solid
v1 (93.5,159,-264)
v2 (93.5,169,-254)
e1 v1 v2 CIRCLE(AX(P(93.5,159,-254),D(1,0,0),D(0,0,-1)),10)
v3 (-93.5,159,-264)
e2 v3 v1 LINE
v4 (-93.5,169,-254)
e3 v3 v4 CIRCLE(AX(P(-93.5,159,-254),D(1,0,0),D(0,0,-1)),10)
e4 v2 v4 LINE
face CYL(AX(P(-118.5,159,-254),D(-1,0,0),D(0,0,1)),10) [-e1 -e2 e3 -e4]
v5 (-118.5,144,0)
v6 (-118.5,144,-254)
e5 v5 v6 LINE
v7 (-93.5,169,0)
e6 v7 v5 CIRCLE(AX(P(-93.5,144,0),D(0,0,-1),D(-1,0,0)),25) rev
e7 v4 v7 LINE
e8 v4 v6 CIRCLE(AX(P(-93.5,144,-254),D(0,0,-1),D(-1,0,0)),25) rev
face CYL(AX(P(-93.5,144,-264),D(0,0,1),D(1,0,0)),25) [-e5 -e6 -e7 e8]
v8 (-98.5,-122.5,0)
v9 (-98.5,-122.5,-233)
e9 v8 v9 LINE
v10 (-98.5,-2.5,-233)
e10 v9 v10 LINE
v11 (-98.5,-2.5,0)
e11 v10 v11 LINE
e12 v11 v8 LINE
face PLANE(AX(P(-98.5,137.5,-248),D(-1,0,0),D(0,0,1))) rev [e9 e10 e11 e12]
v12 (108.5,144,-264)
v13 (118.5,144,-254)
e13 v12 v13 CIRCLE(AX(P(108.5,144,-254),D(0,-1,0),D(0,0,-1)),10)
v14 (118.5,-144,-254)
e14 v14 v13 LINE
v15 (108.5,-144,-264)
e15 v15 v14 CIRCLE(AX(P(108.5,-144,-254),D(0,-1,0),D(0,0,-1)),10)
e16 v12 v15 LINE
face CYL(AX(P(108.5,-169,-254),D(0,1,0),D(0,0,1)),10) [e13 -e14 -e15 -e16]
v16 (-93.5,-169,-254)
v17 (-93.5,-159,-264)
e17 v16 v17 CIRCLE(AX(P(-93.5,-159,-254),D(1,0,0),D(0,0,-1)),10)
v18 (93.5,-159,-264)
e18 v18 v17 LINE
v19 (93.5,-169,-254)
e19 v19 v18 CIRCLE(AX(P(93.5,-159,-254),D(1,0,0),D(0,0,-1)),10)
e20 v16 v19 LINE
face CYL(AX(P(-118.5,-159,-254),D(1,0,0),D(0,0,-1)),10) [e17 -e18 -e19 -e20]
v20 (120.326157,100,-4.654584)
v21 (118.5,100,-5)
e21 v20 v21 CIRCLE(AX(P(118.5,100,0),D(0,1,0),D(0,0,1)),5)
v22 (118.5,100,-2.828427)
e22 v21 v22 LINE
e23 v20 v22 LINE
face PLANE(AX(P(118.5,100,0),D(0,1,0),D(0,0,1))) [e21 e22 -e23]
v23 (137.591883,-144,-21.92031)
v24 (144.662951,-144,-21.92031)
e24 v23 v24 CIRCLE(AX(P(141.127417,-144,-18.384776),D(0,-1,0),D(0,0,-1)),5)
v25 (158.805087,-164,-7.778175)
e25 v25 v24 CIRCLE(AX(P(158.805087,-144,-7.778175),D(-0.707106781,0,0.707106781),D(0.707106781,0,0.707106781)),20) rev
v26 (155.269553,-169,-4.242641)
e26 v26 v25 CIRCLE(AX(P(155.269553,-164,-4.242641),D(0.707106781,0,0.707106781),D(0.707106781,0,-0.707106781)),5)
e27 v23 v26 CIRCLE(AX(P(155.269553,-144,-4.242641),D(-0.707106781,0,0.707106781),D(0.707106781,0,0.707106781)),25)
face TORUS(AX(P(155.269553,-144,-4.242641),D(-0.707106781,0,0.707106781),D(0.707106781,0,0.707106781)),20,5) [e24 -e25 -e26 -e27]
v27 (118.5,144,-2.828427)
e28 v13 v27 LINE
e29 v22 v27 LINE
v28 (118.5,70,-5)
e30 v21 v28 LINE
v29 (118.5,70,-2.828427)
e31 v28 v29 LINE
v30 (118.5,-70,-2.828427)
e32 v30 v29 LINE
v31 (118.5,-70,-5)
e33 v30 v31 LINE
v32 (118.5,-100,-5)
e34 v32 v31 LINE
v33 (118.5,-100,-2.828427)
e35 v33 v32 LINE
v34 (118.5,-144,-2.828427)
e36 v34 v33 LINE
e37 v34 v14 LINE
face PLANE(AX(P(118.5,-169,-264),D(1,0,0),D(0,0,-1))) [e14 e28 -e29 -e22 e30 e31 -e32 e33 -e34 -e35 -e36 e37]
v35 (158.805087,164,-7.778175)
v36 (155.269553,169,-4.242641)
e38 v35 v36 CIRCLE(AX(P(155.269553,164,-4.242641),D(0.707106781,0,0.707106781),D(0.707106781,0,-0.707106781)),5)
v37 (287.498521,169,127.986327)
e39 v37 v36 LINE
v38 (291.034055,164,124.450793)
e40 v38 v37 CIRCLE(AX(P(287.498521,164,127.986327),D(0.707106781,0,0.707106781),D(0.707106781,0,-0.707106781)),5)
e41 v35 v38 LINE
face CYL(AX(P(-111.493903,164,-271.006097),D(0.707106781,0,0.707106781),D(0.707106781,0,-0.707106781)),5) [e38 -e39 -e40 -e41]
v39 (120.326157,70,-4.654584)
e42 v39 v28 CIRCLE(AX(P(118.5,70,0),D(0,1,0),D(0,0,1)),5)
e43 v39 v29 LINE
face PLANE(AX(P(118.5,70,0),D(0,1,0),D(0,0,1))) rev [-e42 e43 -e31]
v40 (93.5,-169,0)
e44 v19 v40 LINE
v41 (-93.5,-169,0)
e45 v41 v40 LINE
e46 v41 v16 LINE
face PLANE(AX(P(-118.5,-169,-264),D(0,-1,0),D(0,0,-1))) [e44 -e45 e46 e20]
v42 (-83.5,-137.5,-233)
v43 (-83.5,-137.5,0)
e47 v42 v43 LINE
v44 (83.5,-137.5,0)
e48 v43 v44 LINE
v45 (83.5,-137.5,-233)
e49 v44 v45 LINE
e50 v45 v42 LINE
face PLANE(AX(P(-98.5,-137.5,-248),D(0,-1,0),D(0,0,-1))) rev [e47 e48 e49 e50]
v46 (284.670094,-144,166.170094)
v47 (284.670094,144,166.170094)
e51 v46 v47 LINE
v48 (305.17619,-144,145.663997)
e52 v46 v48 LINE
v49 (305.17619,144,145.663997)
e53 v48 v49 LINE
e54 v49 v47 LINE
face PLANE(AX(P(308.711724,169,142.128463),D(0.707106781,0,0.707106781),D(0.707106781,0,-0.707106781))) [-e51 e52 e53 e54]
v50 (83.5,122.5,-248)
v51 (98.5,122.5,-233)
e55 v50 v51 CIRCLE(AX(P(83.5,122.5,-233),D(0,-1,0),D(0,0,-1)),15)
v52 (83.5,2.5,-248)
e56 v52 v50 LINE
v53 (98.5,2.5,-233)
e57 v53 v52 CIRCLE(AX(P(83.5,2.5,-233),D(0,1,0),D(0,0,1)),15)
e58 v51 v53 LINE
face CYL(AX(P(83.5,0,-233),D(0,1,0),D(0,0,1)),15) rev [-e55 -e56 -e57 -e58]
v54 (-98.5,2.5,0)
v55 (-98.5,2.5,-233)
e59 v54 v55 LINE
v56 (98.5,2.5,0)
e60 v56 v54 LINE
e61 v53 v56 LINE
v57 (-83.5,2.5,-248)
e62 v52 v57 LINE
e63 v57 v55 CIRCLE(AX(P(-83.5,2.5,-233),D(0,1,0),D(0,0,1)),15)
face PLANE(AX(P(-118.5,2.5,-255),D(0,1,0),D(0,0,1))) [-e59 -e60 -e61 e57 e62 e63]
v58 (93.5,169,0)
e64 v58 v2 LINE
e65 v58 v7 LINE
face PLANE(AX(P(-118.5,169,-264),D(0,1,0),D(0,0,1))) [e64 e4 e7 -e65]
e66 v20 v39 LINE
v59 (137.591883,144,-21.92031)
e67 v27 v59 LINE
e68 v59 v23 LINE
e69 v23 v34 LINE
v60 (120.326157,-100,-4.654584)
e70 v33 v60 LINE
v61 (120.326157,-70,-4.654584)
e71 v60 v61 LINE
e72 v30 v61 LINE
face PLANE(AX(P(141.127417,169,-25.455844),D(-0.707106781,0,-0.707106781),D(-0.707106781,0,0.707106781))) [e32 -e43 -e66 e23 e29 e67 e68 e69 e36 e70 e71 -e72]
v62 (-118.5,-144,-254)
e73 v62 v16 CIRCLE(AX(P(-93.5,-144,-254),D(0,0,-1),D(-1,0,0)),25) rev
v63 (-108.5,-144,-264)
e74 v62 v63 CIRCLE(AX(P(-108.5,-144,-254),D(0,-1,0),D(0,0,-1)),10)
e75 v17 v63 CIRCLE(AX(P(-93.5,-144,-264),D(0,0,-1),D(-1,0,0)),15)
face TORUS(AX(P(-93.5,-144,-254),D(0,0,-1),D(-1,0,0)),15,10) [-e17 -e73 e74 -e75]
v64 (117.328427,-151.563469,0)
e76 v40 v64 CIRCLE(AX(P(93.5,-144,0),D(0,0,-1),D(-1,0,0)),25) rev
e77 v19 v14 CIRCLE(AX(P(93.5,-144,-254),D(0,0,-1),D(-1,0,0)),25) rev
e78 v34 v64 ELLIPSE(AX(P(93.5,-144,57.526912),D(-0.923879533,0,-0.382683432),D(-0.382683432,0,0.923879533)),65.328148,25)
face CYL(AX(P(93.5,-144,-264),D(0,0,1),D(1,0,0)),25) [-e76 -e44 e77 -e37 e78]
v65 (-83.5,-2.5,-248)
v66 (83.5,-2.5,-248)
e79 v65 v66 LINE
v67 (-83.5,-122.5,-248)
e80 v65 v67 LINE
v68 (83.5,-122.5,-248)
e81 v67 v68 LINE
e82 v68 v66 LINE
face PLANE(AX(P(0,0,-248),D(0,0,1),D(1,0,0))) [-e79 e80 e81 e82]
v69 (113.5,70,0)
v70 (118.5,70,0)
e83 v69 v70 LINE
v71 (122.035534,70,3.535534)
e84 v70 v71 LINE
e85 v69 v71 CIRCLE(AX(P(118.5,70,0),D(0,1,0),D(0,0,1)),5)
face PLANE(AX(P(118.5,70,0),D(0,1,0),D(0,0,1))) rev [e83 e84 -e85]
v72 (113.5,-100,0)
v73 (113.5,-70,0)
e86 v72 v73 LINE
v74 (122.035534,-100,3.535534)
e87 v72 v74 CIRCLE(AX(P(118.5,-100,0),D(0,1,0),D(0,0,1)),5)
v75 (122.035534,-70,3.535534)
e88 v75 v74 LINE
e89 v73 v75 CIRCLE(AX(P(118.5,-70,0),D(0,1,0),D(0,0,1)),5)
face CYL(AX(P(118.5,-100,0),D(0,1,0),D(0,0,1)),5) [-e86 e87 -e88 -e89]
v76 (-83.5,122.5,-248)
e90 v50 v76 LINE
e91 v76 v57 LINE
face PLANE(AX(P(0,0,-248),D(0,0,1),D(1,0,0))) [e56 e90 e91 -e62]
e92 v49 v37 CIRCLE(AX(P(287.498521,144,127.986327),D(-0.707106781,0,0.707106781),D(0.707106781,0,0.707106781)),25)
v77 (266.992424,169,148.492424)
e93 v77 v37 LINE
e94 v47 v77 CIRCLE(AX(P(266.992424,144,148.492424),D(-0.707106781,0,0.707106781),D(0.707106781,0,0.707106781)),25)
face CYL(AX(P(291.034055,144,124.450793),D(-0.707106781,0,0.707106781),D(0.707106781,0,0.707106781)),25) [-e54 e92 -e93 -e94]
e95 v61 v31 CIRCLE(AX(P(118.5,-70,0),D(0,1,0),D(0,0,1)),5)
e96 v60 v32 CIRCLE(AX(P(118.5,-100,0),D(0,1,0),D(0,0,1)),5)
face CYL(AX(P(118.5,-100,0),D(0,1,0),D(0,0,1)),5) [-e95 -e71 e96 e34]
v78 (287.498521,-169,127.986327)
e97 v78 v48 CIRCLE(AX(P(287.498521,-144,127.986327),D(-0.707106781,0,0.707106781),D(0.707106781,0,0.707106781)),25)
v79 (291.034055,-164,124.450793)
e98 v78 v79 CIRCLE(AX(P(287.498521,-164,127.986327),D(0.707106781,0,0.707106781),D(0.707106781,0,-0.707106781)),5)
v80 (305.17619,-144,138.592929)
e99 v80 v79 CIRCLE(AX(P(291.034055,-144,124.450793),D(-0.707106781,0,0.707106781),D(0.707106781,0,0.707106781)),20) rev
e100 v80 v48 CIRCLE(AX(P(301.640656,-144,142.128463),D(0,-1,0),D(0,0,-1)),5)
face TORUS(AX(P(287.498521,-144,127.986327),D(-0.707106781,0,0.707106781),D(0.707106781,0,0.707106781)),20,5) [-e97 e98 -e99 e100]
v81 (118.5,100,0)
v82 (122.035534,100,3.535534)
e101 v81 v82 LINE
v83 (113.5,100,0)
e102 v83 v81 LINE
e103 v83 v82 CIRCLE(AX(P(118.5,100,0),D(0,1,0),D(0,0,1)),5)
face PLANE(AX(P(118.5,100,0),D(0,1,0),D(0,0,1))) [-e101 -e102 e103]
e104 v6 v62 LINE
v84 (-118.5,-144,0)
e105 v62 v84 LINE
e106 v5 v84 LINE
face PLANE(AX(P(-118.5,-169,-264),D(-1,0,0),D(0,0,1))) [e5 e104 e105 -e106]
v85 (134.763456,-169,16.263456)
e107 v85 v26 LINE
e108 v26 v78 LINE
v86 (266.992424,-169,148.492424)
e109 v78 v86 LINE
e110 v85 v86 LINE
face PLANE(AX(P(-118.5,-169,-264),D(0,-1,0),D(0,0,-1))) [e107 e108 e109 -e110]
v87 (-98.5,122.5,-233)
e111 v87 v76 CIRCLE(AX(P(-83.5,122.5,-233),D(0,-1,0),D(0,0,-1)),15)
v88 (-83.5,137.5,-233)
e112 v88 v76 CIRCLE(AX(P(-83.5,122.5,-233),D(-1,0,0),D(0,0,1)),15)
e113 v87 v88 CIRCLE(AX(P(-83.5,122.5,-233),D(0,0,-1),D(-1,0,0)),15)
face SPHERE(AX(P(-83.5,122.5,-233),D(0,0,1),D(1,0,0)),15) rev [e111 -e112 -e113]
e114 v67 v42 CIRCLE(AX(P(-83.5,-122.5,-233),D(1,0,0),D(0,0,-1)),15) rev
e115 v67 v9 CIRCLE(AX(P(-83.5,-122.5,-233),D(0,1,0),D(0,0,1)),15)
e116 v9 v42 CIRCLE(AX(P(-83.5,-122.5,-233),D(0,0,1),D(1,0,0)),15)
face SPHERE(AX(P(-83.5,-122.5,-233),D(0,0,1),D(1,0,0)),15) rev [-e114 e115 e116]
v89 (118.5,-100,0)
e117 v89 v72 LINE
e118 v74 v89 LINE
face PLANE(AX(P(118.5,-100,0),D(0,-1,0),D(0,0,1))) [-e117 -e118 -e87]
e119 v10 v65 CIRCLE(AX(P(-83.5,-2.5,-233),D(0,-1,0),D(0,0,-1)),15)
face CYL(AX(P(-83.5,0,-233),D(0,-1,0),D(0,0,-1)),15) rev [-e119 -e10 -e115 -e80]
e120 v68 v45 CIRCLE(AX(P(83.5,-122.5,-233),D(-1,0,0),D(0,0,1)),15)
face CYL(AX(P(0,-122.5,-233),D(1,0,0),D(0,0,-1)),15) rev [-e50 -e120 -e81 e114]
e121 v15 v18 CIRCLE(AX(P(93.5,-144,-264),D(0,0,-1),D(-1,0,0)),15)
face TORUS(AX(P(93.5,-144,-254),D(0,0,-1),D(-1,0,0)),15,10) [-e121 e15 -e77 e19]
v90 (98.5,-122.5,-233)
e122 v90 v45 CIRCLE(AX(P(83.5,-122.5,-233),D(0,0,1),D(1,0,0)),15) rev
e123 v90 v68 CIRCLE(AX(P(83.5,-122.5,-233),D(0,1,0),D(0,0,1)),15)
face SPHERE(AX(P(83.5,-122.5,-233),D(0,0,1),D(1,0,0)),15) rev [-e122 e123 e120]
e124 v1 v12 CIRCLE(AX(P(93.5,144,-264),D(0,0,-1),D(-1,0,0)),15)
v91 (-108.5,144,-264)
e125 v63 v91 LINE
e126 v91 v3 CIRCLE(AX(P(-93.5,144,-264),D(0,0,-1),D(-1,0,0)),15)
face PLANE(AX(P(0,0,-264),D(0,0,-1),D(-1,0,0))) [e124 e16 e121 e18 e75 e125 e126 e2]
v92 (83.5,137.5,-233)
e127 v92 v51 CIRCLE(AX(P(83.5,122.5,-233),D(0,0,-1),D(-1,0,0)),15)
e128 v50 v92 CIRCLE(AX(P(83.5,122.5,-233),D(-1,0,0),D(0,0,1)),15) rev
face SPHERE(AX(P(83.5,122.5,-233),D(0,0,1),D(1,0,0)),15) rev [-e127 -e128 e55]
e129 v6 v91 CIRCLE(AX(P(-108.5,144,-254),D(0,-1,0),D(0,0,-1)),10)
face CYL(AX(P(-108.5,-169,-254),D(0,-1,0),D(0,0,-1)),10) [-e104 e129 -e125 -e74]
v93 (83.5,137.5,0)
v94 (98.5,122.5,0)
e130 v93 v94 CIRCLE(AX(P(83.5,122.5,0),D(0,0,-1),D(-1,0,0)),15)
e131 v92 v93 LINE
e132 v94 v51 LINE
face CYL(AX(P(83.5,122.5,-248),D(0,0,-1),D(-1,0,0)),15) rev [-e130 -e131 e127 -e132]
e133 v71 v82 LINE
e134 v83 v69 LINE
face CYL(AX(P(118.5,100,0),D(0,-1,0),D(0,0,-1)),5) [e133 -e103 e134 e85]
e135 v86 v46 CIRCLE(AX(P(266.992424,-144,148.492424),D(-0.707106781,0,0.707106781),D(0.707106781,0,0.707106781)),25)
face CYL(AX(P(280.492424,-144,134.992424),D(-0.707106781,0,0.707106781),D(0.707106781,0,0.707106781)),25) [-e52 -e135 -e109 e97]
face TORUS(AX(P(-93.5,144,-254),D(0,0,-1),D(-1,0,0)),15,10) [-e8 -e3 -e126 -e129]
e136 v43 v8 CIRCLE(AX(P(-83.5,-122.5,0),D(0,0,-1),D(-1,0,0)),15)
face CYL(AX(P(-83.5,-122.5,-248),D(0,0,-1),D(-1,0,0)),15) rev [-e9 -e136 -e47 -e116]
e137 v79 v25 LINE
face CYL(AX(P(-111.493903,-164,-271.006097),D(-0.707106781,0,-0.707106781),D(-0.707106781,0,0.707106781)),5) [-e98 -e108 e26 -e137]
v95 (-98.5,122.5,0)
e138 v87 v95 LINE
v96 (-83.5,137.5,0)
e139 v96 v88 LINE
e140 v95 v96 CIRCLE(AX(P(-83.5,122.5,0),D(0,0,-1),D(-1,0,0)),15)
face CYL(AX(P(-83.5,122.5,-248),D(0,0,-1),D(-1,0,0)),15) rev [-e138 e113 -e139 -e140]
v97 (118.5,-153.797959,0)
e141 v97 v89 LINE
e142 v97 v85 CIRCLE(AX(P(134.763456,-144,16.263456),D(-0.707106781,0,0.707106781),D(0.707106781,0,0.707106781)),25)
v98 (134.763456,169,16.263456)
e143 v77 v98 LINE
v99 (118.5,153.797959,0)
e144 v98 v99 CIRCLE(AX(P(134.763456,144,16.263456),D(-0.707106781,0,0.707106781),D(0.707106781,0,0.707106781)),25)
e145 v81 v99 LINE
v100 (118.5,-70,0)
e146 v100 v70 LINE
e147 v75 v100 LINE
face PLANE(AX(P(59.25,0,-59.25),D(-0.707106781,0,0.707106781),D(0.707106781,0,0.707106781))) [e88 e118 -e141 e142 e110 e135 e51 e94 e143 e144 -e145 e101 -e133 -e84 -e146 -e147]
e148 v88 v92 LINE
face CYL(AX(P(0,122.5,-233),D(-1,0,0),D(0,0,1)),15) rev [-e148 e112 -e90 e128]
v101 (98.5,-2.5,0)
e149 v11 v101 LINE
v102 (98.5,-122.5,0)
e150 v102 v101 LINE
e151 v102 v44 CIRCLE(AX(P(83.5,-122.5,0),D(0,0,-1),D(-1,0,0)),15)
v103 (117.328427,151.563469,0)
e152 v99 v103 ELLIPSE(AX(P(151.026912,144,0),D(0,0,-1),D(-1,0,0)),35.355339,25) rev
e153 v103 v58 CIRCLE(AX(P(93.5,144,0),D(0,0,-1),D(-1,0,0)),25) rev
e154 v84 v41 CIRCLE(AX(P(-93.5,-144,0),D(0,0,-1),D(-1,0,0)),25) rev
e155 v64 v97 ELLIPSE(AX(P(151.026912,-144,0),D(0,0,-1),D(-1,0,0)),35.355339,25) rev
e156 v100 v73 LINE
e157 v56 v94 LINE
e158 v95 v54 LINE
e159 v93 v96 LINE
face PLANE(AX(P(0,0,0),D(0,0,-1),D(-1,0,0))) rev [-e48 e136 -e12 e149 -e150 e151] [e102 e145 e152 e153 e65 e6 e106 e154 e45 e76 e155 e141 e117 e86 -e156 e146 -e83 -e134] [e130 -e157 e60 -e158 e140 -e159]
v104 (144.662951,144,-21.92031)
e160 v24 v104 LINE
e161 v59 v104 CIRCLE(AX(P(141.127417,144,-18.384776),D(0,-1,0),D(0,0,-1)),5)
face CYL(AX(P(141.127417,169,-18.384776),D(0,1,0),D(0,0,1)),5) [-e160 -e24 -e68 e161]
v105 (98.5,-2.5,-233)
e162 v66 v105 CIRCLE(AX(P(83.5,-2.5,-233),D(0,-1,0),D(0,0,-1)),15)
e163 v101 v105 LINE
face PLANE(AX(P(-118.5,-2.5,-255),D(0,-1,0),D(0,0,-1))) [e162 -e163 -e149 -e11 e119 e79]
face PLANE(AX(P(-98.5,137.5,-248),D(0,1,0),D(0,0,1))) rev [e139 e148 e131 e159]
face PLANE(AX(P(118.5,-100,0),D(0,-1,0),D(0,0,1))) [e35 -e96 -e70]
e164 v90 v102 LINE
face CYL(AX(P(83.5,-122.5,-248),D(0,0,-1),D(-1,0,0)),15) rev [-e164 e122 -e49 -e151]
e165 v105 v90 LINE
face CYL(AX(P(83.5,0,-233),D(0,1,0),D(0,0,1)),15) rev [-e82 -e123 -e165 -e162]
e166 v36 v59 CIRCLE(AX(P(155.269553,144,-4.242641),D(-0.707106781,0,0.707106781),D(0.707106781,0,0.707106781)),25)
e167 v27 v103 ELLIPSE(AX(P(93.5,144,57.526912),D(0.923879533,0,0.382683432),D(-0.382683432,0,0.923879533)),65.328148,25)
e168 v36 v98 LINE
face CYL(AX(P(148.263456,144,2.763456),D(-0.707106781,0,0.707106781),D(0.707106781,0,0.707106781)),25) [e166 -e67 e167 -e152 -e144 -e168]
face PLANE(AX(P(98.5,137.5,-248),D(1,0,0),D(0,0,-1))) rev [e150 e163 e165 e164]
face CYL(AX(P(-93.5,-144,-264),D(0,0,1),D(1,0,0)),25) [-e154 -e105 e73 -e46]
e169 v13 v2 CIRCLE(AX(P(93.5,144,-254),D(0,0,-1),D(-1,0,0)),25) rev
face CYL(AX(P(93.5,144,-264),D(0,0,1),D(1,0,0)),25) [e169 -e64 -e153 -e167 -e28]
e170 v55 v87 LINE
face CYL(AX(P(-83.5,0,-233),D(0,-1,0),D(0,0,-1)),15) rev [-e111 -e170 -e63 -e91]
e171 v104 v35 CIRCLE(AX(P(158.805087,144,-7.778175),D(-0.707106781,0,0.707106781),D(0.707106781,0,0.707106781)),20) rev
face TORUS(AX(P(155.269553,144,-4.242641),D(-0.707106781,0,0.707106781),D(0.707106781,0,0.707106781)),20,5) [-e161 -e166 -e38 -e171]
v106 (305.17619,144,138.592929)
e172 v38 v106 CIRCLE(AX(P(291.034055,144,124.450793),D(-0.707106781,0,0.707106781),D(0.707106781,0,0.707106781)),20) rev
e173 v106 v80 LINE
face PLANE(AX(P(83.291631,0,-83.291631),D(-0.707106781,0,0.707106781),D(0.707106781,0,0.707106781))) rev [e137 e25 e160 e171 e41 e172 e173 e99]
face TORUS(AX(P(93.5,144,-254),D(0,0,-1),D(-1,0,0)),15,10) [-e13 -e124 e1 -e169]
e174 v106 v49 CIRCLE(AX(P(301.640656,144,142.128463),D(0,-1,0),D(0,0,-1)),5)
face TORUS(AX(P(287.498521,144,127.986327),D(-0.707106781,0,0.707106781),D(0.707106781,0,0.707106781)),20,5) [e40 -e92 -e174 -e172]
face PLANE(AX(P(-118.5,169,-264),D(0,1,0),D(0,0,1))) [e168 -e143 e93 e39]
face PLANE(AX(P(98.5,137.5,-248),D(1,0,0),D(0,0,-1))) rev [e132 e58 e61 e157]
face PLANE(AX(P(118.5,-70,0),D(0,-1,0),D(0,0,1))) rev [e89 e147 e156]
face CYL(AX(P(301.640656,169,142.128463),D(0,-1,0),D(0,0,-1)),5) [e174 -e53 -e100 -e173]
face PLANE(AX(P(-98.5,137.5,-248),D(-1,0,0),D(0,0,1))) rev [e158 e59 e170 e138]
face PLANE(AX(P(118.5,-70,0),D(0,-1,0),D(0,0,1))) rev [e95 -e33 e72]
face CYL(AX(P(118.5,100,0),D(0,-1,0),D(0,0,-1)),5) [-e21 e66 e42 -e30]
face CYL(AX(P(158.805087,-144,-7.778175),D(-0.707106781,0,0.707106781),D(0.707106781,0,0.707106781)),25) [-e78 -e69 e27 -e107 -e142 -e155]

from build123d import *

# Parameters (mm, degrees)
SKETCH_1_W          = 237
SKETCH_1_H          = 338
EXTRUDE_1_DEPTH     = 264
SKETCH_2_W          = 197
SKETCH_2_H          = 275
CUT_EXTRUDE_1_DEPTH = 248
SKETCH_3_W          = 237
SKETCH_3_H          = 5
EXTRUDE_2_DEPTH     = 255
EXTRUDE_START       = 70
SKETCH_4_R          = 5
EXTRUDE_3_DEPTH     = 30
SKETCH_6_W          = 338
SKETCH_6_H          = 237
EXTRUDE_6_DEPTH     = 34
FILLET_1_R          = 25
FILLET_2_R          = 10
FILLET_3_R          = 5
FILLET_4_R          = 15
FILLET_5_R          = 15


with BuildPart() as part:
    # 草图1 → 凸台-拉伸1 (new body)
    with BuildSketch(Plane.XY):
        Rectangle(SKETCH_1_W, SKETCH_1_H)
    extrude(amount=-EXTRUDE_1_DEPTH)

    # 草图2 → 切除-拉伸1 (cut)
    with BuildSketch(Plane.XY):
        Rectangle(SKETCH_2_W, SKETCH_2_H)
    extrude(amount=-CUT_EXTRUDE_1_DEPTH, mode=Mode.SUBTRACT)

    # 草图3 → 凸台-拉伸2 (add)
    with BuildSketch(Plane.XY):
        Rectangle(SKETCH_3_W, SKETCH_3_H)
    extrude(amount=-EXTRUDE_2_DEPTH)

    # 草图4 → 凸台-拉伸3 (add)
    with BuildSketch(Plane(origin=(0, 0, 0), x_dir=(1, 0, 0), z_dir=(0, 1, 0)).offset(EXTRUDE_START)):
        with Locations((118.5, 0)):
            Circle(SKETCH_4_R)
    extrude_3 = extrude(amount=EXTRUDE_3_DEPTH)

    # 镜向1: 凸台-拉伸3 across plane
    add(extrude_3.mirror(Plane.ZX))

    # 草图6 → 凸台-拉伸6 (add)
    with BuildSketch(Plane(origin=(59.25, 0, -59.25), x_dir=(0, 1, 0), z_dir=(-0.7071067811865438, 0, 0.7071067811865512))):
        with Locations((0, -200.292153571)):
            Rectangle(SKETCH_6_W, SKETCH_6_H)
    extrude(amount=-EXTRUDE_6_DEPTH)

    # 圆角1
    # the kernel refuses this fillet: 25 mm, written as the material it takes off along each edge
    with BuildSketch(Plane(origin=(118.5, -169, 59.671572875), x_dir=(-1, 0, 0), z_dir=(0, 0, -1))) as fillet_1_piece_1_section:
        with BuildLine():
            CenterArc((FILLET_1_R, FILLET_1_R), FILLET_1_R, 180, 90)
            Line((0, FILLET_1_R), (-FILLET_1_R * 0.02, FILLET_1_R))
            Line((-FILLET_1_R * 0.02, FILLET_1_R), (-FILLET_1_R * 0.02, -FILLET_1_R * 0.02))
            Line((-FILLET_1_R * 0.02, -FILLET_1_R * 0.02), (FILLET_1_R, -FILLET_1_R * 0.02))
            Line((FILLET_1_R, -FILLET_1_R * 0.02), (FILLET_1_R, 0))
        make_face()
    fillet_1_piece_1 = extrude(amount=323.671572875, mode=Mode.PRIVATE)
    fillet_1_piece_1 = split(fillet_1_piece_1, bisect_by=Plane(origin=(179.466338067, -163.404434067, -63.794765192), z_dir=(-0.7071067811865512, 0, -0.7071067811865438)), keep=Keep.TOP, mode=Mode.PRIVATE)
    add(fillet_1_piece_1, mode=Mode.SUBTRACT)
    with BuildSketch(Plane(origin=(-118.5, -169, 0), x_dir=(1, 0, 0), z_dir=(0, 0, -1)), Plane(origin=(-118.5, 169, 0), x_dir=(0, -1, 0), z_dir=(0, 0, -1))) as fillet_1_piece_2:
        with BuildLine():
            CenterArc((FILLET_1_R, -FILLET_1_R), FILLET_1_R, 90, 90)
            Line((0, -FILLET_1_R), (-FILLET_1_R * 0.02, -FILLET_1_R))
            Line((-FILLET_1_R * 0.02, -FILLET_1_R), (-FILLET_1_R * 0.02, FILLET_1_R * 0.02))
            Line((-FILLET_1_R * 0.02, FILLET_1_R * 0.02), (FILLET_1_R, FILLET_1_R * 0.02))
            Line((FILLET_1_R, FILLET_1_R * 0.02), (FILLET_1_R, 0))
        make_face()
    extrude(amount=264, mode=Mode.SUBTRACT)
    with BuildSketch(Plane(origin=(118.5, 169, 59.671572875), x_dir=(0, -1, 0), z_dir=(0, 0, -1))) as fillet_1_piece_3_section:
        with BuildLine():
            CenterArc((FILLET_1_R, FILLET_1_R), FILLET_1_R, 180, 90)
            Line((0, FILLET_1_R), (-FILLET_1_R * 0.02, FILLET_1_R))
            Line((-FILLET_1_R * 0.02, FILLET_1_R), (-FILLET_1_R * 0.02, -FILLET_1_R * 0.02))
            Line((-FILLET_1_R * 0.02, -FILLET_1_R * 0.02), (FILLET_1_R, -FILLET_1_R * 0.02))
            Line((FILLET_1_R, -FILLET_1_R * 0.02), (FILLET_1_R, 0))
        make_face()
    fillet_1_piece_3 = extrude(amount=323.671572875, mode=Mode.PRIVATE)
    fillet_1_piece_3 = split(fillet_1_piece_3, bisect_by=Plane(origin=(179.466338067, 163.404434067, -63.794765192), z_dir=(-0.7071067811865512, 0, -0.7071067811865438)), keep=Keep.TOP, mode=Mode.PRIVATE)
    add(fillet_1_piece_3, mode=Mode.SUBTRACT)
    with BuildSketch(Plane(origin=(284.670093579, -169, 166.170093579), x_dir=(-0.7071067811865512, -1.1368683772161603e-15, -0.7071067811865439), z_dir=(0.7071067811865438, 0, -0.7071067811865512))) as fillet_1_piece_4:
        with BuildLine():
            CenterArc((FILLET_1_R, FILLET_1_R), FILLET_1_R, 180, 90)
            Line((0, FILLET_1_R), (-FILLET_1_R * 0.02, FILLET_1_R))
            Line((-FILLET_1_R * 0.02, FILLET_1_R), (-FILLET_1_R * 0.02, -FILLET_1_R * 0.02))
            Line((-FILLET_1_R * 0.02, -FILLET_1_R * 0.02), (FILLET_1_R, -FILLET_1_R * 0.02))
            Line((FILLET_1_R, -FILLET_1_R * 0.02), (FILLET_1_R, 0))
        make_face()
    extrude(amount=34, mode=Mode.SUBTRACT)
    with BuildSketch(Plane(origin=(74.305826176, -169, 41.365746699), x_dir=(0.7071067811865512, 0, 0.7071067811865439), z_dir=(0.7071067811865438, 0, -0.7071067811865512))) as fillet_1_piece_5_section:
        with BuildLine():
            CenterArc((FILLET_1_R, -FILLET_1_R), FILLET_1_R, 90, 90)
            Line((0, -FILLET_1_R), (-FILLET_1_R * 0.02, -FILLET_1_R))
            Line((-FILLET_1_R * 0.02, -FILLET_1_R), (-FILLET_1_R * 0.02, FILLET_1_R * 0.02))
            Line((-FILLET_1_R * 0.02, FILLET_1_R * 0.02), (FILLET_1_R, FILLET_1_R * 0.02))
            Line((FILLET_1_R, FILLET_1_R * 0.02), (FILLET_1_R, 0))
        make_face()
    fillet_1_piece_5 = extrude(amount=94.5, mode=Mode.PRIVATE)
    fillet_1_piece_5 = split(fillet_1_piece_5, bisect_by=Plane(origin=(118.5, -163.795791277, -7.320817928), z_dir=(1, 0, 0)), keep=Keep.TOP, mode=Mode.PRIVATE)
    add(fillet_1_piece_5, mode=Mode.SUBTRACT)
    with BuildSketch(Plane(origin=(74.305826176, 169, 41.365746699), x_dir=(0.7071067811865512, 0, 0.7071067811865438), z_dir=(0.7071067811865438, 0, -0.7071067811865512))) as fillet_1_piece_6_section:
        with BuildLine():
            CenterArc((FILLET_1_R, FILLET_1_R), FILLET_1_R, 180, 90)
            Line((0, FILLET_1_R), (-FILLET_1_R * 0.02, FILLET_1_R))
            Line((-FILLET_1_R * 0.02, FILLET_1_R), (-FILLET_1_R * 0.02, -FILLET_1_R * 0.02))
            Line((-FILLET_1_R * 0.02, -FILLET_1_R * 0.02), (FILLET_1_R, -FILLET_1_R * 0.02))
            Line((FILLET_1_R, -FILLET_1_R * 0.02), (FILLET_1_R, 0))
        make_face()
    fillet_1_piece_6 = extrude(amount=94.5, mode=Mode.PRIVATE)
    fillet_1_piece_6 = split(fillet_1_piece_6, bisect_by=Plane(origin=(118.5, 163.795791277, -7.320817928), z_dir=(1, 0, 0)), keep=Keep.TOP, mode=Mode.PRIVATE)
    add(fillet_1_piece_6, mode=Mode.SUBTRACT)
    with BuildSketch(Plane(origin=(284.670093579, 169, 166.170093579), x_dir=(-0.7071067811865512, -3.4106051316484808e-15, -0.7071067811865439), z_dir=(0.7071067811865438, 0, -0.7071067811865512))) as fillet_1_piece_7:
        with BuildLine():
            CenterArc((FILLET_1_R, -FILLET_1_R), FILLET_1_R, 90, 90)
            Line((0, -FILLET_1_R), (-FILLET_1_R * 0.02, -FILLET_1_R))
            Line((-FILLET_1_R * 0.02, -FILLET_1_R), (-FILLET_1_R * 0.02, FILLET_1_R * 0.02))
            Line((-FILLET_1_R * 0.02, FILLET_1_R * 0.02), (FILLET_1_R, FILLET_1_R * 0.02))
            Line((FILLET_1_R, FILLET_1_R * 0.02), (FILLET_1_R, 0))
        make_face()
    extrude(amount=34, mode=Mode.SUBTRACT)
    with BuildSketch(Plane(origin=(118.5, -169, 59.671572875), x_dir=(-1, 0, 0), z_dir=(0, 0, -1))) as fillet_1_piece_8a_section:
        with BuildLine():
            CenterArc((FILLET_1_R, FILLET_1_R), FILLET_1_R, 180, 90)
            Line((0, FILLET_1_R), (-FILLET_1_R * 0.02, FILLET_1_R))
            Line((-FILLET_1_R * 0.02, FILLET_1_R), (-FILLET_1_R * 0.02, -FILLET_1_R * 0.02))
            Line((-FILLET_1_R * 0.02, -FILLET_1_R * 0.02), (FILLET_1_R, -FILLET_1_R * 0.02))
            Line((FILLET_1_R, -FILLET_1_R * 0.02), (FILLET_1_R, 0))
        make_face()
    fillet_1_piece_8a = extrude(amount=323.671572875, mode=Mode.PRIVATE)
    fillet_1_piece_8a = split(fillet_1_piece_8a, bisect_by=Plane(origin=(99.013375852, -163.038214912, 16.658197024), z_dir=(0.7071067811865512, 0, 0.7071067811865438)), keep=Keep.TOP, mode=Mode.PRIVATE)
    with BuildSketch(Plane(origin=(74.305826176, -169, 41.365746699), x_dir=(0.7071067811865512, 0, 0.7071067811865439), z_dir=(0.7071067811865438, 0, -0.7071067811865512))) as fillet_1_piece_8b_section:
        with BuildLine():
            CenterArc((FILLET_1_R, -FILLET_1_R), FILLET_1_R, 90, 90)
            Line((0, -FILLET_1_R), (-FILLET_1_R * 0.02, -FILLET_1_R))
            Line((-FILLET_1_R * 0.02, -FILLET_1_R), (-FILLET_1_R * 0.02, FILLET_1_R * 0.02))
            Line((-FILLET_1_R * 0.02, FILLET_1_R * 0.02), (FILLET_1_R, FILLET_1_R * 0.02))
            Line((FILLET_1_R, FILLET_1_R * 0.02), (FILLET_1_R, 0))
        make_face()
    fillet_1_piece_8b = extrude(amount=94.5, mode=Mode.PRIVATE)
    fillet_1_piece_8b = split(fillet_1_piece_8b, bisect_by=Plane(origin=(118.5, -163.038214912, 24.729821031), z_dir=(-1, 0, 0)), keep=Keep.TOP, mode=Mode.PRIVATE)
    fillet_1_piece_8 = fillet_1_piece_8a & fillet_1_piece_8b
    add(fillet_1_piece_8, mode=Mode.SUBTRACT)
    with BuildSketch(Plane(origin=(118.5, 169, 59.671572875), x_dir=(0, -1, 0), z_dir=(0, 0, -1))) as fillet_1_piece_9a_section:
        with BuildLine():
            CenterArc((FILLET_1_R, FILLET_1_R), FILLET_1_R, 180, 90)
            Line((0, FILLET_1_R), (-FILLET_1_R * 0.02, FILLET_1_R))
            Line((-FILLET_1_R * 0.02, FILLET_1_R), (-FILLET_1_R * 0.02, -FILLET_1_R * 0.02))
            Line((-FILLET_1_R * 0.02, -FILLET_1_R * 0.02), (FILLET_1_R, -FILLET_1_R * 0.02))
            Line((FILLET_1_R, -FILLET_1_R * 0.02), (FILLET_1_R, 0))
        make_face()
    fillet_1_piece_9a = extrude(amount=323.671572875, mode=Mode.PRIVATE)
    fillet_1_piece_9a = split(fillet_1_piece_9a, bisect_by=Plane(origin=(99.013375852, 163.038214912, 16.658197024), z_dir=(0.7071067811865512, 0, 0.7071067811865438)), keep=Keep.TOP, mode=Mode.PRIVATE)
    with BuildSketch(Plane(origin=(74.305826176, 169, 41.365746699), x_dir=(0.7071067811865512, 0, 0.7071067811865438), z_dir=(0.7071067811865438, 0, -0.7071067811865512))) as fillet_1_piece_9b_section:
        with BuildLine():
            CenterArc((FILLET_1_R, FILLET_1_R), FILLET_1_R, 180, 90)
            Line((0, FILLET_1_R), (-FILLET_1_R * 0.02, FILLET_1_R))
            Line((-FILLET_1_R * 0.02, FILLET_1_R), (-FILLET_1_R * 0.02, -FILLET_1_R * 0.02))
            Line((-FILLET_1_R * 0.02, -FILLET_1_R * 0.02), (FILLET_1_R, -FILLET_1_R * 0.02))
            Line((FILLET_1_R, -FILLET_1_R * 0.02), (FILLET_1_R, 0))
        make_face()
    fillet_1_piece_9b = extrude(amount=94.5, mode=Mode.PRIVATE)
    fillet_1_piece_9b = split(fillet_1_piece_9b, bisect_by=Plane(origin=(118.5, 163.038214912, 24.729821031), z_dir=(-1, 0, 0)), keep=Keep.TOP, mode=Mode.PRIVATE)
    fillet_1_piece_9 = fillet_1_piece_9a & fillet_1_piece_9b
    add(fillet_1_piece_9, mode=Mode.SUBTRACT)

    # 圆角2
    fillet_2_edges = [part.edges().sort_by_distance(p)[0] for p in [
        (0, -169, -264),
        (118.5, 0, -264),
        (-118.5, 0, -264),
        (0, 169, -264),
        (-111.17766953, 161.67766953, -264),
        (111.17766953, 161.67766953, -264),
        (-111.17766953, -161.67766953, -264),
        (111.17766953, -161.67766953, -264),
    ]]
    fillet(fillet_2_edges, radius=FILLET_2_R)

    # 圆角3
    fillet_3_edges = [part.edges().sort_by_distance(p)[0] for p in [
        (224.919570569, -169, 58.336309448),
        (141.127416998, 0, -25.455844123),
        (224.919570569, 169, 58.336309448),
        (308.711724139, 0, 142.128463018),
        (146.305086528, 161.67766953, -20.278174593),
        (303.53405461, 161.67766953, 136.950793489),
        (303.53405461, -161.67766953, 136.950793489),
        (146.305086528, -161.67766953, -20.278174593),
    ]]
    fillet(fillet_3_edges, radius=FILLET_3_R)

    # 圆角4
    fillet_4_edges = [part.edges().sort_by_distance(p)[0] for p in [
        (98.5, -70, -248),
        (98.5, 137.5, -124),
        (0, -137.5, -248),
        (98.5, -137.5, -124),
        (-98.5, -137.5, -124),
        (0, 137.5, -248),
        (-98.5, 137.5, -124),
        (-98.5, -70, -248),
    ]]
    fillet(fillet_4_edges, radius=FILLET_4_R)

    # 圆角5
    # the kernel refuses this fillet: 15 mm, written as the material it adds along each edge
    with BuildSketch(Plane(origin=(-83.5, 122.5, -233), x_dir=(0, 0, -1), z_dir=(-1, 0, 0))) as fillet_5_piece_1_section:
        Polygon((0, 0), (FILLET_5_R * 1.02, 0), (FILLET_5_R * 1.02, -FILLET_5_R * 1.02), (0, -FILLET_5_R * 1.02), align=None)
    fillet_5_piece_1 = extrude(amount=FILLET_5_R * 1.02, mode=Mode.PRIVATE)
    fillet_5_piece_1 = fillet_5_piece_1 - Plane(origin=(-83.5, 122.5, -233), x_dir=(0, -0.7071067811865475, 0.7071067811865475), z_dir=(-1, 0, 0)) * Sphere(FILLET_5_R, mode=Mode.PRIVATE)
    add(fillet_5_piece_1)
    with BuildSketch(Plane(origin=(83.5, 122.5, -233), x_dir=(0, 0, -1), z_dir=(1, 0, 0))) as fillet_5_piece_2_section:
        Polygon((0, 0), (FILLET_5_R * 1.02, 0), (FILLET_5_R * 1.02, FILLET_5_R * 1.02), (0, FILLET_5_R * 1.02), align=None)
    fillet_5_piece_2 = extrude(amount=FILLET_5_R * 1.02, mode=Mode.PRIVATE)
    fillet_5_piece_2 = fillet_5_piece_2 - Plane(origin=(83.5, 122.5, -233), x_dir=(0, -0.7071067811865475, 0.7071067811865475), z_dir=(1, 0, 0)) * Sphere(FILLET_5_R, mode=Mode.PRIVATE)
    add(fillet_5_piece_2)
    with BuildSketch(Plane(origin=(-98.5, -35, -248), x_dir=(0, 0, 1), z_dir=(0, 1, 0)), Plane(origin=(98.5, 122.5, -248), x_dir=(0, 0, 1), z_dir=(0, -1, 0))) as fillet_5_piece_3:
        with BuildLine():
            CenterArc((FILLET_5_R, FILLET_5_R), FILLET_5_R, 180, 90)
            Line((0, FILLET_5_R), (0, 0))
            Line((0, 0), (FILLET_5_R, 0))
        make_face()
    extrude(amount=157.5)


solid = part.part
